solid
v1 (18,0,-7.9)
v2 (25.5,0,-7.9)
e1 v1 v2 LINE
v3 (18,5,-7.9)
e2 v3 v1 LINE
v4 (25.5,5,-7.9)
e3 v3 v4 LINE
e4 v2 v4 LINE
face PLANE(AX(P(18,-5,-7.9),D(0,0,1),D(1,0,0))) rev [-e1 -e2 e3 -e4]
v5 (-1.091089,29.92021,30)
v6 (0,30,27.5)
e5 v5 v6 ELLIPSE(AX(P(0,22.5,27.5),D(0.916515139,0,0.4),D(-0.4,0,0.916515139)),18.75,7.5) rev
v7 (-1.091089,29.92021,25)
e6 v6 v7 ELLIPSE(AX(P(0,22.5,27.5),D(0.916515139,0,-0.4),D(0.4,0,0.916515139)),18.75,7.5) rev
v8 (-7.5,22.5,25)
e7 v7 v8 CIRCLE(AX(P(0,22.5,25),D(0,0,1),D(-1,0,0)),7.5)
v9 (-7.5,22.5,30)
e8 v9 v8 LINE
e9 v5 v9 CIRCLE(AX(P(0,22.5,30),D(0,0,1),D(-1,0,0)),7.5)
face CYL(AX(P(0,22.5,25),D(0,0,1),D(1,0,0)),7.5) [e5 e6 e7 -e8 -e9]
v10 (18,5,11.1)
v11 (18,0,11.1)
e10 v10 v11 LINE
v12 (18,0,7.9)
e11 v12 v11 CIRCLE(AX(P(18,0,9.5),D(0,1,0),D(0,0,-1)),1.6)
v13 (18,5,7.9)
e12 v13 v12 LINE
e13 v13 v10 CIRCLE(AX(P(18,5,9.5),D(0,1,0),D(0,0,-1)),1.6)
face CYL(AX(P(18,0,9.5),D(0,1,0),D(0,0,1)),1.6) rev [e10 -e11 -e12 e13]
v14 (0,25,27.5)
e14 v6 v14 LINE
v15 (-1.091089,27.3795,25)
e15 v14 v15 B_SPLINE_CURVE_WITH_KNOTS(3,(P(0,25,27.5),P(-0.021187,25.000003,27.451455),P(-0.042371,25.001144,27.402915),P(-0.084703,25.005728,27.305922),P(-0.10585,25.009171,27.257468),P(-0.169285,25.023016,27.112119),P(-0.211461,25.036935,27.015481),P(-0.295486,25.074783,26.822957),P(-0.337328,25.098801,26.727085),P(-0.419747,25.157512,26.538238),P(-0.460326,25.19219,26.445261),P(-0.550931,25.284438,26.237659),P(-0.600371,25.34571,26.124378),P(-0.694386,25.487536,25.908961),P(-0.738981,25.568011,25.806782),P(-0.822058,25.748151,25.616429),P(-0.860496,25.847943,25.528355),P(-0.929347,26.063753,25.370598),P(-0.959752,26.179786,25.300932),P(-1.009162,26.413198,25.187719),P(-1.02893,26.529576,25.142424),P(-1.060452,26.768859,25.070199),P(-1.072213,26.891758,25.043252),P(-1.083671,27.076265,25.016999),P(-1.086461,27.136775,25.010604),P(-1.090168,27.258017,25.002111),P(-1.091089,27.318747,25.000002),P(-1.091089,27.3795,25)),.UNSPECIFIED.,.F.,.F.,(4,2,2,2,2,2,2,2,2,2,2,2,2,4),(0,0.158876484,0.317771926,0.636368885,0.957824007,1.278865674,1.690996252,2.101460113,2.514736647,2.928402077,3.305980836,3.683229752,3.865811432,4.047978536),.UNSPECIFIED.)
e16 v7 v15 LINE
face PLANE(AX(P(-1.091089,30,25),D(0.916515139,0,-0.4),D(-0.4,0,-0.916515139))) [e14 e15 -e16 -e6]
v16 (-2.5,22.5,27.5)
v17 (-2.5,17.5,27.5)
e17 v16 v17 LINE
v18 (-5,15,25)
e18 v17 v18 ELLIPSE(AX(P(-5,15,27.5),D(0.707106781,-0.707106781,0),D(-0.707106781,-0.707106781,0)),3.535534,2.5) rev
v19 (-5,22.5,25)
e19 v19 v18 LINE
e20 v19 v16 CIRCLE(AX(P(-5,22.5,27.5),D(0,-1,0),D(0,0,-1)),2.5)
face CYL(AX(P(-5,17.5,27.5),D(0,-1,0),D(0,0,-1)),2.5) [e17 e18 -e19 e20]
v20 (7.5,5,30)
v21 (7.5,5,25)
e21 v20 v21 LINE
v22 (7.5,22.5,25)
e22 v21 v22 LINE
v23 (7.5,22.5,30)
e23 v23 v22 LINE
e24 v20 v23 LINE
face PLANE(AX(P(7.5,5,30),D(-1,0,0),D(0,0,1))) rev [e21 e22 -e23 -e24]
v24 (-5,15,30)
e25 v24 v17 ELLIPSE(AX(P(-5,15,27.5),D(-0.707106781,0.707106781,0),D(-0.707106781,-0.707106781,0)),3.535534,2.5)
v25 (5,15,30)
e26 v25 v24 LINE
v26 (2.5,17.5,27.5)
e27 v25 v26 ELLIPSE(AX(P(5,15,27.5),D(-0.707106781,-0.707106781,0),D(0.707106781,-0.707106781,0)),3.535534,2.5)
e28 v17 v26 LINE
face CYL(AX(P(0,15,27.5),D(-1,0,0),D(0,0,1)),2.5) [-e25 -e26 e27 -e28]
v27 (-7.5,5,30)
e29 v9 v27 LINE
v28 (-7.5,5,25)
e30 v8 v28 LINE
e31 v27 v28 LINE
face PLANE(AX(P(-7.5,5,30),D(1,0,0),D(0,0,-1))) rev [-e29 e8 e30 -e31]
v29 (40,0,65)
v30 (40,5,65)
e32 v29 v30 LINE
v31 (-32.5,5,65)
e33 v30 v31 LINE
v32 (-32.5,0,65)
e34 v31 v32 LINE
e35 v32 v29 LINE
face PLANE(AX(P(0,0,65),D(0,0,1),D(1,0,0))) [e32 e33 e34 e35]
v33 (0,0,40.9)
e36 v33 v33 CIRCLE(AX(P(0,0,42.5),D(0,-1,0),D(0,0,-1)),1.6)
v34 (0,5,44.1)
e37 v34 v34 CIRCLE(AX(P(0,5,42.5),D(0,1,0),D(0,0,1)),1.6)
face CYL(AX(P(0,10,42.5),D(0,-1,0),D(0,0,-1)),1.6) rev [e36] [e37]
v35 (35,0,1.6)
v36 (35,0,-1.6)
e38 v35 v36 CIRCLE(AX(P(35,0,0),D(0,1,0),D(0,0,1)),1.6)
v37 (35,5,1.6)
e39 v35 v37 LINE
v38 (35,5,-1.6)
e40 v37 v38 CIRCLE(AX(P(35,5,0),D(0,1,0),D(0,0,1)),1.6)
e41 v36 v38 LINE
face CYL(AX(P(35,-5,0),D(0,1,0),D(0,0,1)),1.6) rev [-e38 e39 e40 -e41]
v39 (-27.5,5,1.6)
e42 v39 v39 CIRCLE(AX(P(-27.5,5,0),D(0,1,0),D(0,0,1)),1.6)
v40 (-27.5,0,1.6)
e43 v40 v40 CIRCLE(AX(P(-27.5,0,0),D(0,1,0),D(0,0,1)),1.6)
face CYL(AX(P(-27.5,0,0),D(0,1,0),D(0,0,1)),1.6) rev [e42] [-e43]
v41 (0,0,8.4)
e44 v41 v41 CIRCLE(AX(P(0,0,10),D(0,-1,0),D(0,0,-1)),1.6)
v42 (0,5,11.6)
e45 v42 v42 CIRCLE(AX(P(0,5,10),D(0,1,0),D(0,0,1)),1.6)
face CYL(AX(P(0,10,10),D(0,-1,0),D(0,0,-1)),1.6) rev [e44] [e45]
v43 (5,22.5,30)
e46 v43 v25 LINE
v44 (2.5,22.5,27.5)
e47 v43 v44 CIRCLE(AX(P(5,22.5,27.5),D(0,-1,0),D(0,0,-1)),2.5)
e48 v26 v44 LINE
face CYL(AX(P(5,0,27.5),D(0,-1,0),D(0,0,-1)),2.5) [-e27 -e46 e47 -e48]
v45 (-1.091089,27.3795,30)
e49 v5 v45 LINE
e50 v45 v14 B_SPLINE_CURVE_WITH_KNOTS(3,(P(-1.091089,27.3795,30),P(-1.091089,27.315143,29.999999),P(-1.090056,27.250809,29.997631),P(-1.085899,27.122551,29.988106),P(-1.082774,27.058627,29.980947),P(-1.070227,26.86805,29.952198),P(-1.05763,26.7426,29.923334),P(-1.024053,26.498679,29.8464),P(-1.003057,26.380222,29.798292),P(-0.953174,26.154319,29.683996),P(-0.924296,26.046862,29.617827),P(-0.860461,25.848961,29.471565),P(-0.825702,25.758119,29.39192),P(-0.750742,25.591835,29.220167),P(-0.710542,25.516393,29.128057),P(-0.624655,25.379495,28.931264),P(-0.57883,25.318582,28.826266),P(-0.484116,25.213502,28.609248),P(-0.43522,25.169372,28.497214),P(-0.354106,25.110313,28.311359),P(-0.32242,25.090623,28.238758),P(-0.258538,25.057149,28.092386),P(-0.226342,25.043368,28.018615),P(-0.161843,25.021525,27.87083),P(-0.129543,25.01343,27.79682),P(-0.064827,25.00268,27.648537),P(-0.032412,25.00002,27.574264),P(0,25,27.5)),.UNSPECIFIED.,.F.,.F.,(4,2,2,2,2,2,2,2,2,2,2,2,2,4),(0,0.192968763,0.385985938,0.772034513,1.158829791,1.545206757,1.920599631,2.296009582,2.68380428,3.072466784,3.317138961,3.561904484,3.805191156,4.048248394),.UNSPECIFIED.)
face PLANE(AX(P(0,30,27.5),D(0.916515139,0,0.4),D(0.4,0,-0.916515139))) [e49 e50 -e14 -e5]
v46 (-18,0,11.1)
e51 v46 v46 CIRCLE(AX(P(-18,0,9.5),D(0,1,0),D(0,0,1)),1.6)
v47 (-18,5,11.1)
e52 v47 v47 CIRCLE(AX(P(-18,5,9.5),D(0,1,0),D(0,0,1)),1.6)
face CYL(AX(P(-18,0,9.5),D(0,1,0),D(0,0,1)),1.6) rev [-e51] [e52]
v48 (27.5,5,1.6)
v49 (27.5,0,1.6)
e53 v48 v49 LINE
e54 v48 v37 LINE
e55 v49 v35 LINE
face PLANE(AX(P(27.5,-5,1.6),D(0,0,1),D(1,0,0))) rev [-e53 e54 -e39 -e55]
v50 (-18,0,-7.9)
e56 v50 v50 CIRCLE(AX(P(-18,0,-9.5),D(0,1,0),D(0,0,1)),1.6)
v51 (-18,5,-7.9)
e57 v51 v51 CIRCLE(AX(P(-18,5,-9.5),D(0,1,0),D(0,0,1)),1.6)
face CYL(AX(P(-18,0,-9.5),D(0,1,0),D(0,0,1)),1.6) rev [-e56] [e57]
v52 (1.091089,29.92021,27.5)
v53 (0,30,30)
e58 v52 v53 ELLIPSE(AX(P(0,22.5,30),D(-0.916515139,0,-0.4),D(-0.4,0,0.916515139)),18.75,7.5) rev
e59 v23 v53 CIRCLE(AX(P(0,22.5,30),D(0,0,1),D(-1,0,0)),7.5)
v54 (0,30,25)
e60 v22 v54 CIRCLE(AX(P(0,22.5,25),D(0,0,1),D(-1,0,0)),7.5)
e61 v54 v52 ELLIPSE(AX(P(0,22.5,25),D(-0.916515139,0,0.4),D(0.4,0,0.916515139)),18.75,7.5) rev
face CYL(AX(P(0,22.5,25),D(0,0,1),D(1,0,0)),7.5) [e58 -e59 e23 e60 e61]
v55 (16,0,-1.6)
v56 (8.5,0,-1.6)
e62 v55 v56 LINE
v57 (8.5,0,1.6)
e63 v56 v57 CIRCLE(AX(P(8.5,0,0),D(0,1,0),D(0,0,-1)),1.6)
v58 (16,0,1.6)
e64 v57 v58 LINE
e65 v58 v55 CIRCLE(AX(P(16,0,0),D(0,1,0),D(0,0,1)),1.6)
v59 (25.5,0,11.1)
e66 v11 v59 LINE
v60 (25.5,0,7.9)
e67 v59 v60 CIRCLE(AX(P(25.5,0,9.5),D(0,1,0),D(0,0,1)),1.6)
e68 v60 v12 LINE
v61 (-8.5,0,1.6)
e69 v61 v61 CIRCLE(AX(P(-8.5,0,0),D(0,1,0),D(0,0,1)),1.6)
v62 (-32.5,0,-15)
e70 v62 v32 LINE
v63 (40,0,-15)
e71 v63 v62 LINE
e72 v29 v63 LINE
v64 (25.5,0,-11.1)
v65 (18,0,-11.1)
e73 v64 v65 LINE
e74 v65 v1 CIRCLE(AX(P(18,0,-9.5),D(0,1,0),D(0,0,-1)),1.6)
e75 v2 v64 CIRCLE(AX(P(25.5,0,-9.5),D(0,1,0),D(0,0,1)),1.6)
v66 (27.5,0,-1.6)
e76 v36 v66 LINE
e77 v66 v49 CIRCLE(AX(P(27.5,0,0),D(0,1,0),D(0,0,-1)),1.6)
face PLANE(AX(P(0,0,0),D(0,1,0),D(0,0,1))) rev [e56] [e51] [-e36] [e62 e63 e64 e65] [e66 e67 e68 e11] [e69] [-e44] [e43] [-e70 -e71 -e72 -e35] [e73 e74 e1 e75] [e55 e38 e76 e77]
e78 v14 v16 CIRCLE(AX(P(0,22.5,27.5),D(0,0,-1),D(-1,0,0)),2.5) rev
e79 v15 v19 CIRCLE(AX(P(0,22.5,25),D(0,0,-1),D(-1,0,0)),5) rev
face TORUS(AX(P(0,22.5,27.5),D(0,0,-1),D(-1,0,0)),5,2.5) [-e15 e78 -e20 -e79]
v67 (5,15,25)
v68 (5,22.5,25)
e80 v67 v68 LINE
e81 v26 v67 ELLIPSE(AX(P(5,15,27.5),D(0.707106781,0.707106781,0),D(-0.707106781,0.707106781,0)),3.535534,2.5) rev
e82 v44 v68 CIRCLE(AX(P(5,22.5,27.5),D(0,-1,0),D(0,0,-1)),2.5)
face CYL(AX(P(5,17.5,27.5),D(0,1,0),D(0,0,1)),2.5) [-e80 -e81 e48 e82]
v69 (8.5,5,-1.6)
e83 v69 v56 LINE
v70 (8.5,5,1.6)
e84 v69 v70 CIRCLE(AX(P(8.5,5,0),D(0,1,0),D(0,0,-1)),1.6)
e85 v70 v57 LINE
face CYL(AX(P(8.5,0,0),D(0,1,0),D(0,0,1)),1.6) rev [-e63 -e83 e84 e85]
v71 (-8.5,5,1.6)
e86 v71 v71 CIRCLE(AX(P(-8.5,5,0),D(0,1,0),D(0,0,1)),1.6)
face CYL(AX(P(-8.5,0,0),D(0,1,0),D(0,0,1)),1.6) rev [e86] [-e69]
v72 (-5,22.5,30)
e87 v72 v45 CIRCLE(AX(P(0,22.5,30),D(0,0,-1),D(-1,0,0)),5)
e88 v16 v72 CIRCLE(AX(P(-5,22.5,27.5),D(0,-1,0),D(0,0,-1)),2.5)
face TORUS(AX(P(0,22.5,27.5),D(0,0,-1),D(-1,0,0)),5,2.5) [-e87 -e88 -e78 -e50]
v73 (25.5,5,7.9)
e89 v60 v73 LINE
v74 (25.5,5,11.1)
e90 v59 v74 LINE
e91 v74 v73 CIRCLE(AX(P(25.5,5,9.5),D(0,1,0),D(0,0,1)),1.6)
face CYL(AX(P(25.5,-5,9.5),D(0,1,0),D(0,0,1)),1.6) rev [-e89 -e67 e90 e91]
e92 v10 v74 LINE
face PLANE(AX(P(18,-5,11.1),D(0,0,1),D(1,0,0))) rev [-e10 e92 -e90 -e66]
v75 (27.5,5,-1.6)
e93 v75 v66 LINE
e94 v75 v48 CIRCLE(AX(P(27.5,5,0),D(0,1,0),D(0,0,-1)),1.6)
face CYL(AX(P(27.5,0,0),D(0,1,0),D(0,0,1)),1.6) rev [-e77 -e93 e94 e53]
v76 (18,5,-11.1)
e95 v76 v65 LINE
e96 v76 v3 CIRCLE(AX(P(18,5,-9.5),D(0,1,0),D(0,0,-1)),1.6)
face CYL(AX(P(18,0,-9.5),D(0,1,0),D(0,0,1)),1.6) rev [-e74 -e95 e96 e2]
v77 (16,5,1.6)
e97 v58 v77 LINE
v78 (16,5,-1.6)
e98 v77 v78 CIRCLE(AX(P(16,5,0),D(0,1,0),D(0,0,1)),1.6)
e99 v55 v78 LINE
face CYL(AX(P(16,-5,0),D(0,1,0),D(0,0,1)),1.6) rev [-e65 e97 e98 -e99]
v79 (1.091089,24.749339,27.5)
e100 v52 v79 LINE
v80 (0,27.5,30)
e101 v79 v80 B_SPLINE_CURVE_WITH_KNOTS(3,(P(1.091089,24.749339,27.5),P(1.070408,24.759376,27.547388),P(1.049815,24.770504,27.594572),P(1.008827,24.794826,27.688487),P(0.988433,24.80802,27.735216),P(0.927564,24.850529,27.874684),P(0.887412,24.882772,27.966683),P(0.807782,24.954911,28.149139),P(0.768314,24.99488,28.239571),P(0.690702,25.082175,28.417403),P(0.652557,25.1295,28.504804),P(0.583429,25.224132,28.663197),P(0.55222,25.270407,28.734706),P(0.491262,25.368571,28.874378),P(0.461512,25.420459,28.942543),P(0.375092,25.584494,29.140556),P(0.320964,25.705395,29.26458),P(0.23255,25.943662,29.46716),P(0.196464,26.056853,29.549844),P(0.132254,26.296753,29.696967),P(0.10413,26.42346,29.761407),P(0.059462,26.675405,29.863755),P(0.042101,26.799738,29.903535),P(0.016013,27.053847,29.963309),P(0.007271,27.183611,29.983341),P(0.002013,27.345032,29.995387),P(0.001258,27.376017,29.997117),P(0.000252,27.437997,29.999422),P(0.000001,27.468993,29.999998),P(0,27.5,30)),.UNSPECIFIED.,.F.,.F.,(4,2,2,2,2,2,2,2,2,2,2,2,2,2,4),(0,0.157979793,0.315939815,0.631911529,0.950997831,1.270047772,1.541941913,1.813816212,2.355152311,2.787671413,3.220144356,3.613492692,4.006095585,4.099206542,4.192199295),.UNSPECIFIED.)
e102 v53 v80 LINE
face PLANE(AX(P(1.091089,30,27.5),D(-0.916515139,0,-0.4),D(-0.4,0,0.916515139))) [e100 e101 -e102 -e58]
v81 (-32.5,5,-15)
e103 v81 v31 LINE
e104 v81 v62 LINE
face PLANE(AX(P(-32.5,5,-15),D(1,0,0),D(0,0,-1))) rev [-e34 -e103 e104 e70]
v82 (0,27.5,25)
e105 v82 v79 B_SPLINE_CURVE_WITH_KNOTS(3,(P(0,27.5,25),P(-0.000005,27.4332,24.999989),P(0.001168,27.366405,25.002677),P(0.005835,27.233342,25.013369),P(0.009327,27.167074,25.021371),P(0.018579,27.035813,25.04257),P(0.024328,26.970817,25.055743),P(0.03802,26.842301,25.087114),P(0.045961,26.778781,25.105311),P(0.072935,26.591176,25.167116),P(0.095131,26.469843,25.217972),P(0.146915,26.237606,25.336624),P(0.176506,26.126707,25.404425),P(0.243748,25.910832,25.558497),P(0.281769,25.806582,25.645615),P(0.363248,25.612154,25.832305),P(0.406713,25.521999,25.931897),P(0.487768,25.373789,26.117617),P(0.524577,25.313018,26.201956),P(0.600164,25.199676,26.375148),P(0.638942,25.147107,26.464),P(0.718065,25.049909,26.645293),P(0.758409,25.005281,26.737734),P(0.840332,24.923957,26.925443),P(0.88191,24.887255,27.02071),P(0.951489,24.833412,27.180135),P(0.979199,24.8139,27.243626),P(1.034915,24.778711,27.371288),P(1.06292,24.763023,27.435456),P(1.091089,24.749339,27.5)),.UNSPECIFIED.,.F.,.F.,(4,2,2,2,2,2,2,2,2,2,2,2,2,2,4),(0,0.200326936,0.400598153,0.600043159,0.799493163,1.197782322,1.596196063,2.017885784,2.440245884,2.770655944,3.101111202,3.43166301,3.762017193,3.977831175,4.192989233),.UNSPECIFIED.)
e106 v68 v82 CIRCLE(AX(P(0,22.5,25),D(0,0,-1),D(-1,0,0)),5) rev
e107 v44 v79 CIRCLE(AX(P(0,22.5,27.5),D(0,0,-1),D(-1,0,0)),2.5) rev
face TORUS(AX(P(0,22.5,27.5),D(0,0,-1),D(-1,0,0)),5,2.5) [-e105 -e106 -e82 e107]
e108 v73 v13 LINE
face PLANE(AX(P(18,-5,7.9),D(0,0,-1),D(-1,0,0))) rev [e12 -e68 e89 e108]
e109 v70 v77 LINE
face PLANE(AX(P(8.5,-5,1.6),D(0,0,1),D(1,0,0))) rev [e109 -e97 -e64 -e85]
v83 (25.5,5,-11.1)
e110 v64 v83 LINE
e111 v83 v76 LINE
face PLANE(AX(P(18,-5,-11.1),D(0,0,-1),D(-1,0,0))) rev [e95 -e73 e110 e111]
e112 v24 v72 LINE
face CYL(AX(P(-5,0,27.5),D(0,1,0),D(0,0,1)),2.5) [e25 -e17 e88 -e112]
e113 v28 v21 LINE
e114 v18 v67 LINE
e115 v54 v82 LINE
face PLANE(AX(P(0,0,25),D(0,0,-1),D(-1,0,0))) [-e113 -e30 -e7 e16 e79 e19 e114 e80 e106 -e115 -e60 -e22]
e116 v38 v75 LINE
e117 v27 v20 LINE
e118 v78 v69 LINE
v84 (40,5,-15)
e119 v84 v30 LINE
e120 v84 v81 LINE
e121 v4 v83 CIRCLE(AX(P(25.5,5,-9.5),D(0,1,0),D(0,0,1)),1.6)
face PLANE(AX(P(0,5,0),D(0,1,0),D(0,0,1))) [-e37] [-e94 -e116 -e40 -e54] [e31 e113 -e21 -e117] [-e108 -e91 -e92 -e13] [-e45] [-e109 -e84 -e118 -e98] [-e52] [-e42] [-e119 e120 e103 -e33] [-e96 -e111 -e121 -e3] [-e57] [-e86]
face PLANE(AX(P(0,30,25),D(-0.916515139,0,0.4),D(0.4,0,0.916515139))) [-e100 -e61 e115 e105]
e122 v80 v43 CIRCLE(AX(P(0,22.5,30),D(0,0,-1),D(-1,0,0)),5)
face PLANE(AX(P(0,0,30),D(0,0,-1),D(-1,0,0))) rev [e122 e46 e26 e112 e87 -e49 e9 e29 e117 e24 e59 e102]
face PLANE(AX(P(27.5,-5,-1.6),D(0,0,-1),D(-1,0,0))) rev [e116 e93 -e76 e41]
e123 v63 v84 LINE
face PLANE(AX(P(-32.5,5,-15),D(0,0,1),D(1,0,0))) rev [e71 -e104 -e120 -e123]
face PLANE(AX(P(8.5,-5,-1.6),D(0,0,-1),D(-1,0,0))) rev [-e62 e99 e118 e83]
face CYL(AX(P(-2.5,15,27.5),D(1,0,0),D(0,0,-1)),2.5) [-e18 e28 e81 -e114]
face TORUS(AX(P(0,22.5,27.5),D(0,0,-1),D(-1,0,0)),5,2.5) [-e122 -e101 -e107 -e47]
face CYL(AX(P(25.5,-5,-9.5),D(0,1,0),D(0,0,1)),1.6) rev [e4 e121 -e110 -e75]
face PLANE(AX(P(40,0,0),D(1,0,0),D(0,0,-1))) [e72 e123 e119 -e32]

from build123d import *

# Parameters (mm, degrees)
SKETCH2_W           = 65
SKETCH2_H           = 30
BOSS_EXTRUDE1_DEPTH = 5
SKETCH3_R           = 1.6
CUT_EXTRUDE1_DEPTH  = 37.142080737
SKETCH5_W           = 30
SKETCH5_H           = 5
BOSS_EXTRUDE2_DEPTH = 7.5
CUT_EXTRUDE2_DEPTH  = 10
SKETCH7_W           = 72.5
SKETCH7_H           = 5
BOSS_EXTRUDE3_DEPTH = 50
BOSS_EXTRUDE4_DEPTH = 5
BOSS_EXTRUDE5_DEPTH = 5
SKETCH6_R           = 1.6
CUT_EXTRUDE3_DEPTH  = 10
CUT_EXTRUDE4_DEPTH  = 79.302298817
FILLET1_R           = 2.5


with BuildPart() as part:
    # Sketch2 → Boss-Extrude1 (new body)
    with BuildSketch(Plane(origin=(0, 0, 0), x_dir=(1, 0, 0), z_dir=(0, 1, 0))):
        Rectangle(SKETCH2_W, SKETCH2_H)
    extrude(amount=BOSS_EXTRUDE1_DEPTH)

    # Sketch3 → Cut-Extrude1 (cut, through all)
    with BuildSketch(Plane(origin=(0, 5, 0), x_dir=(1, 0, 0), z_dir=(0, 1, 0))):
        with Locations(Location((-27.5, 0, 0), (0, 0, 270))):
            Circle(SKETCH3_R)
        with Locations(Location((-18, 9.5, 0), (0, 0, 270))):
            Circle(SKETCH3_R)
        with Locations(Location((-8.5, 0, 0), (0, 0, 270))):
            Circle(SKETCH3_R)
        with Locations(Location((-18, -9.5, 0), (0, 0, 270))):
            Circle(SKETCH3_R)
        with Locations(Location((18, -9.5, 0), (0, 0, 90))):
            Circle(SKETCH3_R)
        with Locations(Location((27.5, 0, 0), (0, 0, 90))):
            Circle(SKETCH3_R)
        with Locations(Location((18, 9.5, 0), (0, 0, 90))):
            Circle(SKETCH3_R)
        with Locations(Location((8.5, 0, 0), (0, 0, 90))):
            Circle(SKETCH3_R)
    extrude(amount=-CUT_EXTRUDE1_DEPTH, mode=Mode.SUBTRACT)

    # Sketch5 → Boss-Extrude2 (add)
    with BuildSketch(Plane(origin=(32.5, 0, 0), x_dir=(0, 0, -1), z_dir=(1, 0, 0))):
        with Locations((0, 2.5)):
            Rectangle(SKETCH5_W, SKETCH5_H)
    extrude(amount=BOSS_EXTRUDE2_DEPTH)

    # Sketch4 → Cut-Extrude2 (cut)
    with BuildSketch(Plane(origin=(0, 5, 0), x_dir=(1, 0, 0), z_dir=(0, 1, 0))):
        with BuildLine():
            Line((8.5, 1.6), (16, 1.6))
            ThreePointArc((16, 1.6), (17.6, 0), (16, -1.6))
            Line((16, -1.6), (8.5, -1.6))
            ThreePointArc((8.5, -1.6), (6.9, 0), (8.5, 1.6))
        make_face()
        with BuildLine():
            Line((27.5, 1.6), (35, 1.6))
            ThreePointArc((35, 1.6), (36.6, 0), (35, -1.6))
            Line((35, -1.6), (27.5, -1.6))
            ThreePointArc((27.5, -1.6), (25.9, 0), (27.5, 1.6))
        make_face()
        with BuildLine():
            Line((18, -7.9), (25.5, -7.9))
            ThreePointArc((25.5, -7.9), (27.1, -9.5), (25.5, -11.1))
            Line((25.5, -11.1), (18, -11.1))
            ThreePointArc((18, -11.1), (16.4, -9.5), (18, -7.9))
        make_face()
        with BuildLine():
            Line((18, 11.1), (25.5, 11.1))
            ThreePointArc((25.5, 11.1), (27.1, 9.5), (25.5, 7.9))
            Line((25.5, 7.9), (18, 7.9))
            ThreePointArc((18, 7.9), (16.4, 9.5), (18, 11.1))
        make_face()
    extrude(amount=-CUT_EXTRUDE2_DEPTH, mode=Mode.SUBTRACT)

    # Sketch7 → Boss-Extrude3 (add)
    with BuildSketch(Plane.XY.offset(15)):
        with Locations((3.75, 2.5)):
            Rectangle(SKETCH7_W, SKETCH7_H)
    extrude(amount=BOSS_EXTRUDE3_DEPTH)

    # Sketch10 → Boss-Extrude4 (add)
    with BuildSketch(Plane.XY.offset(25)):
        Polygon((-7.5, 5), (7.5, 5), (7.5, 22.5), (2.5, 22.5), (2.5, 17.5), (-2.5, 17.5), (-2.5, 22.5), (-7.5, 22.5), align=None)
    extrude(amount=BOSS_EXTRUDE4_DEPTH)

    # Sketch11 → Boss-Extrude5 (add)
    with BuildSketch(Plane.XY.offset(30)):
        with BuildLine():
            Line((-7.5, 22.5), (-2.5, 22.5))
            ThreePointArc((-2.5, 22.5), (0, 25), (2.5, 22.5))
            Line((2.5, 22.5), (7.5, 22.5))
            ThreePointArc((7.5, 22.5), (0, 30), (-7.5, 22.5))
        make_face()
    extrude(amount=-BOSS_EXTRUDE5_DEPTH)

    # Sketch6 → Cut-Extrude3 (cut)
    with BuildSketch(Plane.XZ):
        with Locations(Location((0, 42.5, 0), (0, 0, 270))):
            Circle(SKETCH6_R)
        with Locations(Location((0, 10, 0), (0, 0, 270))):
            Circle(SKETCH6_R)
    extrude(amount=-CUT_EXTRUDE3_DEPTH, mode=Mode.SUBTRACT)

    # Sketch14 → Cut-Extrude4 (cut, through all)
    with BuildSketch(Plane(origin=(0, 17.5, 0), x_dir=(1, 0, 0), z_dir=(0, 1, 0))):
        Polygon((-1.091089451, -25), (0, -27.5), (-1.091089451, -30), (0, -30), (1.091089451, -27.5), (0, -25), align=None)
    extrude(amount=CUT_EXTRUDE4_DEPTH, mode=Mode.SUBTRACT)

    # Fillet1
    fillet1_edges = [part.edges().sort_by_distance(p)[0] for p in [
        (-2.5, 20, 25),
        (1.767766953, 24.267766953, 25),
        (1.767766953, 24.267766953, 30),
        (-2.118693421, 23.827078817, 30),
        (-2.118693421, 23.827078817, 25),
        (2.5, 20, 25),
        (0, 17.5, 25),
        (2.5, 20, 30),
        (0, 17.5, 30),
        (-2.5, 20, 30),
    ]]
    fillet(fillet1_edges, radius=FILLET1_R - 0.0001)  # a hair under: the kernel refuses the full size


solid = part.part
